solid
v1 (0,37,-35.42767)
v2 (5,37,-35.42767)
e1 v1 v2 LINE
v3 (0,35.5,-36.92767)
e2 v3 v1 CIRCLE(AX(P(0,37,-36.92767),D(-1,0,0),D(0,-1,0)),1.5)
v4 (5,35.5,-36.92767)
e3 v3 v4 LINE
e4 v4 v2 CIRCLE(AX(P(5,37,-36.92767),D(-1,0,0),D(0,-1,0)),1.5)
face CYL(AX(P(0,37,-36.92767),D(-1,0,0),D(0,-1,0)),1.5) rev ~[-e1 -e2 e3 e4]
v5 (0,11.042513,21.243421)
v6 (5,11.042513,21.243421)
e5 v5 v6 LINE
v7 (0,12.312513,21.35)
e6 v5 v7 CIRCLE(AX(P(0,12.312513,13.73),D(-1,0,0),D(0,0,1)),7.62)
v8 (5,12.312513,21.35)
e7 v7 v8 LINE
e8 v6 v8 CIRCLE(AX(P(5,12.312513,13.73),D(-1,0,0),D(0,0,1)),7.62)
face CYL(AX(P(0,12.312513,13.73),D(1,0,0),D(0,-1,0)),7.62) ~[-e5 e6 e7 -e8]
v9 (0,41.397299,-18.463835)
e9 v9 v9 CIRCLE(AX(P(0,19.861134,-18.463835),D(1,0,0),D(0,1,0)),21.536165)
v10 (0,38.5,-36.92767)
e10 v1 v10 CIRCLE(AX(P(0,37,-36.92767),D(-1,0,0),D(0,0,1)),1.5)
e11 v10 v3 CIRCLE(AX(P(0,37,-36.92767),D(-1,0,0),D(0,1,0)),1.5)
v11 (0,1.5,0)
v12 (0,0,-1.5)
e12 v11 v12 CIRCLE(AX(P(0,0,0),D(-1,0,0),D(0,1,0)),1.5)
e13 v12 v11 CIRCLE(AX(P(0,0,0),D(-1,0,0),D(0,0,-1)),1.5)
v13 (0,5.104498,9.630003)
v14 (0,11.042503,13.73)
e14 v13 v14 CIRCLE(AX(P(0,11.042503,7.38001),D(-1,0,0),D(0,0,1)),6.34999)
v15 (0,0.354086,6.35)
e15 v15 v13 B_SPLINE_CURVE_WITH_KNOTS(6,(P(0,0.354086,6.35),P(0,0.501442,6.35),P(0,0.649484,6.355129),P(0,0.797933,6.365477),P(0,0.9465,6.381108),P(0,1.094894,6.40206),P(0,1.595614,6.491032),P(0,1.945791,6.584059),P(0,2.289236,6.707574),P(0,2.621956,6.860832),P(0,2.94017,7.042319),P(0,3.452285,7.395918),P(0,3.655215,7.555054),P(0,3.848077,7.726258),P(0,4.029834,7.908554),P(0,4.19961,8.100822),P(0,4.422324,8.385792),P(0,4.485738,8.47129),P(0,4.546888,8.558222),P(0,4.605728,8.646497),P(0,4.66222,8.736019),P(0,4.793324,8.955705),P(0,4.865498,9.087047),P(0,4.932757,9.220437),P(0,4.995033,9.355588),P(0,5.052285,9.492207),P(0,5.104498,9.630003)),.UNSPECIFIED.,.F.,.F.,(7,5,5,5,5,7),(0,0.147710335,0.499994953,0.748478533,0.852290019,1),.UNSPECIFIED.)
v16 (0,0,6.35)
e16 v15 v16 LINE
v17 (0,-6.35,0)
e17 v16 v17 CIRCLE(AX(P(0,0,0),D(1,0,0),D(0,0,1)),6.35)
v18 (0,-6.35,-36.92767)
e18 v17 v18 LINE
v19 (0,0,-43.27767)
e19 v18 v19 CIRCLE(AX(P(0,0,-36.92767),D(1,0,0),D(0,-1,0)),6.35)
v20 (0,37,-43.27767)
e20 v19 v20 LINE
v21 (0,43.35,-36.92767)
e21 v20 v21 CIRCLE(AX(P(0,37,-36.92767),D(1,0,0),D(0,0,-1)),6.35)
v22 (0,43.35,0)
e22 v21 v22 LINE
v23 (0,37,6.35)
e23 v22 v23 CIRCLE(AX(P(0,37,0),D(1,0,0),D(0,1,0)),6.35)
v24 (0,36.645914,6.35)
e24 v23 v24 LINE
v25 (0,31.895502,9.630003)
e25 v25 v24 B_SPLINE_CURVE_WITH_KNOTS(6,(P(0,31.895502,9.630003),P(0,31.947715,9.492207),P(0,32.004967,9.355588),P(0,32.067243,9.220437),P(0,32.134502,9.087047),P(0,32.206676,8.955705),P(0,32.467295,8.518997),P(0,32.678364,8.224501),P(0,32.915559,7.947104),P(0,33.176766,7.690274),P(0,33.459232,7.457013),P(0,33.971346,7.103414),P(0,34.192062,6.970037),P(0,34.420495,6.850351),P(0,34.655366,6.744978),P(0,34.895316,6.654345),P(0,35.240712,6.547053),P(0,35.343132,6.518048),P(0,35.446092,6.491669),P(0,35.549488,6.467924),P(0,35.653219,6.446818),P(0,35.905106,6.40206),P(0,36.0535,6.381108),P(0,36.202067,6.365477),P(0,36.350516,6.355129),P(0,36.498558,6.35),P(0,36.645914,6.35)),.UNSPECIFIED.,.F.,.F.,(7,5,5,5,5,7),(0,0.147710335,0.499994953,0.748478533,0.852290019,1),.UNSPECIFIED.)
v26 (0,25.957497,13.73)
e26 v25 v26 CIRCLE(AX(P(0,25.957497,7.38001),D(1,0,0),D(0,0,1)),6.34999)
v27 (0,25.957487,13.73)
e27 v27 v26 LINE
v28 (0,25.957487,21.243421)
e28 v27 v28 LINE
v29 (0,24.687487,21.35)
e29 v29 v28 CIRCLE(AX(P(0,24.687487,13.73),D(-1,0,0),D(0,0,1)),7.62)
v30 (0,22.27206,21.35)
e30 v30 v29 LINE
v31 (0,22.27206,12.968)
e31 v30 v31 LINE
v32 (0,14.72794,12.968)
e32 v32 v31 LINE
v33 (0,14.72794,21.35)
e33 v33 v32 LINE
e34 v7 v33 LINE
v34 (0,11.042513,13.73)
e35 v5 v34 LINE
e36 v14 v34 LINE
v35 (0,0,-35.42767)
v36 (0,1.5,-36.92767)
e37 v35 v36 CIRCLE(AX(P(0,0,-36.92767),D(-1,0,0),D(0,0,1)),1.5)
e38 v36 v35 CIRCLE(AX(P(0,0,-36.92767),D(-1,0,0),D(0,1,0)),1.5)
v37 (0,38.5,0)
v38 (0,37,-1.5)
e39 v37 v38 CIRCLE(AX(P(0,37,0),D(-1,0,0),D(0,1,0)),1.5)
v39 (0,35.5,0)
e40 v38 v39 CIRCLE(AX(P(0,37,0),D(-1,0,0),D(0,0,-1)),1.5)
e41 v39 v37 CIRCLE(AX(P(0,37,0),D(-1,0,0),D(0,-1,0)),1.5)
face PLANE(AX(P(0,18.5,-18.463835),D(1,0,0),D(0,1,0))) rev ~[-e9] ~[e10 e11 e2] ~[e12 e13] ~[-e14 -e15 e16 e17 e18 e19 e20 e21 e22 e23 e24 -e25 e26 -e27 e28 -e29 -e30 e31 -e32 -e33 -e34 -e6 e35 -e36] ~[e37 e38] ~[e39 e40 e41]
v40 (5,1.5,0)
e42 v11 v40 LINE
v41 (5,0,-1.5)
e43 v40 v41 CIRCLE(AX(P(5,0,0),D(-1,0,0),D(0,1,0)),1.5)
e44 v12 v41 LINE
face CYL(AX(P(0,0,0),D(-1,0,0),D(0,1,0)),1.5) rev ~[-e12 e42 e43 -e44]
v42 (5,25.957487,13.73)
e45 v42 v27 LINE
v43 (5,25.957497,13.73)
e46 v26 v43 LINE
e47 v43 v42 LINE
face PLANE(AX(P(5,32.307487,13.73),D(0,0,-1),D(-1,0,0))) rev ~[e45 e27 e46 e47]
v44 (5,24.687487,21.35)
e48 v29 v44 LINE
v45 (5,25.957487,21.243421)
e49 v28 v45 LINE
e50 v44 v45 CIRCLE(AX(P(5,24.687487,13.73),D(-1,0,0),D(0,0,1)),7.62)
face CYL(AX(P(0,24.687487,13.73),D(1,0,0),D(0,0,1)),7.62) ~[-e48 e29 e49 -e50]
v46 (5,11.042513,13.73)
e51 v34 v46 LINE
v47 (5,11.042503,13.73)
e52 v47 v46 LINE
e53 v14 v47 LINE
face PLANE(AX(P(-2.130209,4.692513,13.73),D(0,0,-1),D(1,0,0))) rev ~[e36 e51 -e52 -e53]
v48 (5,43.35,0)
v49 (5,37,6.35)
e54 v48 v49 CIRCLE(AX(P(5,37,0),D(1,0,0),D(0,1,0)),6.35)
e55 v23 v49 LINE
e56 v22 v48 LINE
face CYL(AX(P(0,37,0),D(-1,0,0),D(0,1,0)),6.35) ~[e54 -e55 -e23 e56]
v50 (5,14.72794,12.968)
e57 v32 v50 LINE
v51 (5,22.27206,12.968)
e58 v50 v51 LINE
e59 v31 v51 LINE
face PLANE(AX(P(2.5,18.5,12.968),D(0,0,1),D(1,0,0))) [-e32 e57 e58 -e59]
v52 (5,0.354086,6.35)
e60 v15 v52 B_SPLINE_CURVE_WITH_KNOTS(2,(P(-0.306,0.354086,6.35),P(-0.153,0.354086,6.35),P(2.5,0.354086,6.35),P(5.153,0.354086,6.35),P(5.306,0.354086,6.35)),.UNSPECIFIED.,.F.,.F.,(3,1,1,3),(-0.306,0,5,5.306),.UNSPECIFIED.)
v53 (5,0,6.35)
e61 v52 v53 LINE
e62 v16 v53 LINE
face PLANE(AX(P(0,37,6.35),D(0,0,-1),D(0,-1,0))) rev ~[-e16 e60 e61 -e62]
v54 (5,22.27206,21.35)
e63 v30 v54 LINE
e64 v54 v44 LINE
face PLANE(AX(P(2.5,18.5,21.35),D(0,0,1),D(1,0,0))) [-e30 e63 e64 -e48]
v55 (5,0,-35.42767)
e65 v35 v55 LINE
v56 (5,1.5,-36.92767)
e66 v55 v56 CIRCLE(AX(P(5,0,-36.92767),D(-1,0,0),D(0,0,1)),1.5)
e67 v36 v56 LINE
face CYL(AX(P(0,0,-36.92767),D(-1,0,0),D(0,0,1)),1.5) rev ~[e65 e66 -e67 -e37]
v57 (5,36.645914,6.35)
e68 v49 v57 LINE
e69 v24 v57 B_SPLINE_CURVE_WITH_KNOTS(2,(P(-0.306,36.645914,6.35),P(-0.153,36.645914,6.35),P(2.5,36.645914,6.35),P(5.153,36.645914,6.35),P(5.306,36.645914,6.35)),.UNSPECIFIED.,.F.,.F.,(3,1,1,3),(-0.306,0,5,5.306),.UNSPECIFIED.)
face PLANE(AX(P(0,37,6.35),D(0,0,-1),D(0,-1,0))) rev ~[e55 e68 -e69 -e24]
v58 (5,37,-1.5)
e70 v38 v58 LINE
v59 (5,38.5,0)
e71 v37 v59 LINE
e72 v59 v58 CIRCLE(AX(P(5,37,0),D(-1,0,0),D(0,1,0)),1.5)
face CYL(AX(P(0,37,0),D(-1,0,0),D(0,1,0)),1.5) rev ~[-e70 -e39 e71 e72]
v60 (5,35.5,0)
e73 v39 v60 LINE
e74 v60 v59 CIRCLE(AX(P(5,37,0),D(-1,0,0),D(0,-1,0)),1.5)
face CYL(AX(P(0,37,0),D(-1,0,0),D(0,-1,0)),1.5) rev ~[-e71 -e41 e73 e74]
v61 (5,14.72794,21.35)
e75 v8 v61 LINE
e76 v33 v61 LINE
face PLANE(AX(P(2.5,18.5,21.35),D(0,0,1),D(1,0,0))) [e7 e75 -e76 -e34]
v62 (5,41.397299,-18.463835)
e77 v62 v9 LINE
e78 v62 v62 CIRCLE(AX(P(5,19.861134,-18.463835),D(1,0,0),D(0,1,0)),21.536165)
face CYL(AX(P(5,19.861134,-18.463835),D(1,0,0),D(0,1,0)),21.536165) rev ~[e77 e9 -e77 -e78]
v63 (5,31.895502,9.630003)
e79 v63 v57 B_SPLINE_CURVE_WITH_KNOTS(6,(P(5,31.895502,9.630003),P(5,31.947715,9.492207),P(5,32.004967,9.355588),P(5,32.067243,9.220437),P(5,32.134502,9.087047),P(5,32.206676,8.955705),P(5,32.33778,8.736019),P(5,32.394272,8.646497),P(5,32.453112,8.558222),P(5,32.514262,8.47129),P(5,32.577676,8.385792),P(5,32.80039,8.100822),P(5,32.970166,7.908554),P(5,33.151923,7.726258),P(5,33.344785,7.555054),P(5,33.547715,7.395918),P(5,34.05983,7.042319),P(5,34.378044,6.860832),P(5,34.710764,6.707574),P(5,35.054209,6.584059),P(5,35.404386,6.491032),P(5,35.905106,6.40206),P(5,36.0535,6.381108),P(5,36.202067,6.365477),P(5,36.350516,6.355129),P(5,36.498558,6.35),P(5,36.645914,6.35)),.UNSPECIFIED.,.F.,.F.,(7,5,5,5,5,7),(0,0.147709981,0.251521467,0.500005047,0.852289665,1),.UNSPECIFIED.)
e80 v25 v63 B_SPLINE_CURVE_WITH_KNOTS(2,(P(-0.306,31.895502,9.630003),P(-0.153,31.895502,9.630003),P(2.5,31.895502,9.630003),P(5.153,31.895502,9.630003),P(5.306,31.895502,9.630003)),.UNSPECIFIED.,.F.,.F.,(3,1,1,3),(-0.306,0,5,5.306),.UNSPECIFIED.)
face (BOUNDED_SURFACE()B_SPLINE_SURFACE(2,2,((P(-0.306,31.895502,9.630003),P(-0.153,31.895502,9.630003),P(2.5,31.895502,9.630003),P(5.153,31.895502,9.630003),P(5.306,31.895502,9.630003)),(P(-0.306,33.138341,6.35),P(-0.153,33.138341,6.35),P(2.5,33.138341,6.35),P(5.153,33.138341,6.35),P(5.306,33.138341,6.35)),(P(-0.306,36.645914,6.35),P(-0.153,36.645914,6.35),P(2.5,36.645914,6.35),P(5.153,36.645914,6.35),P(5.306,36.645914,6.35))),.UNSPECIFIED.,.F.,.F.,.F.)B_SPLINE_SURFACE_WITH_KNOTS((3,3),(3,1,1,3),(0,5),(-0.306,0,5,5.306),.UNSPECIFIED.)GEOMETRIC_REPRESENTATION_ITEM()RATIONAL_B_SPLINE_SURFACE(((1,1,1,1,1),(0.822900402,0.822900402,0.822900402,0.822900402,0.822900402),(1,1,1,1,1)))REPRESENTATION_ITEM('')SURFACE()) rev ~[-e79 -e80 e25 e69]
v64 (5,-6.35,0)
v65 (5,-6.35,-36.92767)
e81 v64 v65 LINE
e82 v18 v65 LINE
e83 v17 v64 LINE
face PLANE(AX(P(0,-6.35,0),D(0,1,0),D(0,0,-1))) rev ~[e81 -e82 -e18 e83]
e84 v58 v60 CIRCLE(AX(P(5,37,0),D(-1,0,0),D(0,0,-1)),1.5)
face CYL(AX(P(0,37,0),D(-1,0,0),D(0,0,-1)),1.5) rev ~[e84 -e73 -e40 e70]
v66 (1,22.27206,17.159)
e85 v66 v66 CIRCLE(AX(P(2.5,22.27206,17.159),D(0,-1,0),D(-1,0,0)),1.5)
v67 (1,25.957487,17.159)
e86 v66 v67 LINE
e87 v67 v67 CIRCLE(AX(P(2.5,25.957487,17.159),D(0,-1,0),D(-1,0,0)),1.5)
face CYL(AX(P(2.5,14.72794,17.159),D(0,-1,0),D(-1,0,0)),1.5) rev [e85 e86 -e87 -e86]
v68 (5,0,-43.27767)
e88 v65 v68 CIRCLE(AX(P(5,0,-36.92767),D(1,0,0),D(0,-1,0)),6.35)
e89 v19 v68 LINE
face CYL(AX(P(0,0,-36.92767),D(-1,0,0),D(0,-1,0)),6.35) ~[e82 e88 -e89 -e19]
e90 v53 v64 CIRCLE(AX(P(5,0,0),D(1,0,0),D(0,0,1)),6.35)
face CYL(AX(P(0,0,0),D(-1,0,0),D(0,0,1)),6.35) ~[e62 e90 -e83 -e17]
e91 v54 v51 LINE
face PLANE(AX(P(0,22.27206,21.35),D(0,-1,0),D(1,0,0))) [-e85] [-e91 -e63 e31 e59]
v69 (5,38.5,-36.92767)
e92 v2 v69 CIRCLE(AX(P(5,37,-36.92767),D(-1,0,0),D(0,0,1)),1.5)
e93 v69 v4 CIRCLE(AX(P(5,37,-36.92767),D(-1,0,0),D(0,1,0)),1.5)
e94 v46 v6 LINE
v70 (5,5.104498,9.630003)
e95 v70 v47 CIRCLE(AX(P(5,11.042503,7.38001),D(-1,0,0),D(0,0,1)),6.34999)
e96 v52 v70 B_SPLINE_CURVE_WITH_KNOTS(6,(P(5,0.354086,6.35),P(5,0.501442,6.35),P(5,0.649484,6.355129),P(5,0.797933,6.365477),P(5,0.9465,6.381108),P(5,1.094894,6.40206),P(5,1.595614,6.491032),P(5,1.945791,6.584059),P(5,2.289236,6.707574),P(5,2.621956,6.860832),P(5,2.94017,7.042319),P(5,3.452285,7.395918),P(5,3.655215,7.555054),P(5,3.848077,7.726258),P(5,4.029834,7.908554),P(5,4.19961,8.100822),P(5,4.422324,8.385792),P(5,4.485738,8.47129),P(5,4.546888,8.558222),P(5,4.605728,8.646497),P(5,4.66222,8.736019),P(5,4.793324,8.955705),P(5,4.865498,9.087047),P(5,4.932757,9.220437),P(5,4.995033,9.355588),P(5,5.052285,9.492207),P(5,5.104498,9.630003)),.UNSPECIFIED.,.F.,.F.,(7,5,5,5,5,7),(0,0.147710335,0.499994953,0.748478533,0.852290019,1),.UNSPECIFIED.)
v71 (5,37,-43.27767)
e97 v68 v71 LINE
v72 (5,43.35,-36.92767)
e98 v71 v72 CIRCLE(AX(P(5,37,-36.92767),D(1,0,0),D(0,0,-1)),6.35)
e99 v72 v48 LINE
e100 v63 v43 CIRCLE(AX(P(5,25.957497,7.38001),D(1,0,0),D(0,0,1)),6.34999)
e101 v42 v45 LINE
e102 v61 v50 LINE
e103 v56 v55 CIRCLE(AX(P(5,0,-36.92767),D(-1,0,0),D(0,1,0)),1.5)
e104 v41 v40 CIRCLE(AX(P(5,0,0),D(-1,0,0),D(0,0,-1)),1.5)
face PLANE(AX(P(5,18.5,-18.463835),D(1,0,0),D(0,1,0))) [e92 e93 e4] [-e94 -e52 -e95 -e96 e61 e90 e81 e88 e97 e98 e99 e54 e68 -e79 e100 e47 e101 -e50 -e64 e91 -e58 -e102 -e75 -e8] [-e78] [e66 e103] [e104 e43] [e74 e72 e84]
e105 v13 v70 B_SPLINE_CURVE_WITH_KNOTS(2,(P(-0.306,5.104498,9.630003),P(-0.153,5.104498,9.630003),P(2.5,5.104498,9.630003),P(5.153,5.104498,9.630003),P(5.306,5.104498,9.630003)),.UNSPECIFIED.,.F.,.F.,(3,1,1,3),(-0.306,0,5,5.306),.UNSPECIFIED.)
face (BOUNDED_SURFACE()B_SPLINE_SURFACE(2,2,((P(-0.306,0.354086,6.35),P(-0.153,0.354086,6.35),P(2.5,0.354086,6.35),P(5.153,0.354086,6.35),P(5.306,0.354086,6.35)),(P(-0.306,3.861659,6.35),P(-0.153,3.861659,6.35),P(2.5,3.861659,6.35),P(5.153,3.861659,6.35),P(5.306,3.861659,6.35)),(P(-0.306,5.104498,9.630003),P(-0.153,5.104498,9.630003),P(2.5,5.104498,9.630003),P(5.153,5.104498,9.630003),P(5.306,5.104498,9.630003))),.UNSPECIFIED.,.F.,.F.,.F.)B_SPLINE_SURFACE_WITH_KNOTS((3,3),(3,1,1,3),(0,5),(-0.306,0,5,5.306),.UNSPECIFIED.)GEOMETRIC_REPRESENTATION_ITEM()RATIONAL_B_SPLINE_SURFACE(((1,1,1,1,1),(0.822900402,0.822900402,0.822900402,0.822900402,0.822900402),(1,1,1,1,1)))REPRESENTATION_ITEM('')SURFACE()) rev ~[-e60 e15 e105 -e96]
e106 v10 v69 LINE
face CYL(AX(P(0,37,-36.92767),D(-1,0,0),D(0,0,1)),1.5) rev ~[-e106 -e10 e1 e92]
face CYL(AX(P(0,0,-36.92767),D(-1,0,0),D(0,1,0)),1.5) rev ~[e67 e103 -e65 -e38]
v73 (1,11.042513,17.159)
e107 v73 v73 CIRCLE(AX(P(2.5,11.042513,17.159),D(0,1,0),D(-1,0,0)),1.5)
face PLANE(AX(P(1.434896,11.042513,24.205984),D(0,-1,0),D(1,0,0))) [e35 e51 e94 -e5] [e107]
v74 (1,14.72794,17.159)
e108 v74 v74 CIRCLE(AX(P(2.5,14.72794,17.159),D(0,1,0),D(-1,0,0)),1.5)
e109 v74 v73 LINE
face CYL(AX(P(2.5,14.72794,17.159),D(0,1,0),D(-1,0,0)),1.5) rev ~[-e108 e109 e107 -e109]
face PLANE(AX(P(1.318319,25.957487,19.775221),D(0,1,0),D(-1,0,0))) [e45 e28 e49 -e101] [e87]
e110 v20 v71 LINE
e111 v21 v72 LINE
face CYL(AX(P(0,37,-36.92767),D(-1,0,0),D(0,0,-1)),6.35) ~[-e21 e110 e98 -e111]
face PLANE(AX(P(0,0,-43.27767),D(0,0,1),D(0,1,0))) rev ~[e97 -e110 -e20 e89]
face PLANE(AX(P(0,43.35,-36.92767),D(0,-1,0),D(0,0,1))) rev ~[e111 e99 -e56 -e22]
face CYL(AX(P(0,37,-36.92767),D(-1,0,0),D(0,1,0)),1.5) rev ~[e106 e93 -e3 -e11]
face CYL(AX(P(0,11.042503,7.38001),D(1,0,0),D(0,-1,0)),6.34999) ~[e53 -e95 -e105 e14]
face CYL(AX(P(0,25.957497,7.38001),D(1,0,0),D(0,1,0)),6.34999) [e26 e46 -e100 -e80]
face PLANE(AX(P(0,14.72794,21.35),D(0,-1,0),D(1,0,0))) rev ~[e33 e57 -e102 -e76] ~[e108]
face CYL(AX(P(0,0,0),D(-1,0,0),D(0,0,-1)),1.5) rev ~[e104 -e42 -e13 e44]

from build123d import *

# Parameters (mm, degrees)
F1_DEPTH       = 5
F2_R           = 21.536165151
F3_DEPTH       = 5.001
F4_W           = 5
F4_H           = 27.6149739623
F5_DEPTH       = 15
F6_R           = 7.62
F7_W           = 5
F7_H           = 7.544119532
F8_DEPTH       = 8.382
F9_R           = 1.5
F10_DEPTH      = 21.078940234
F10_DEPTH_BACK = 28.623059766
F11_W          = 7.3633623496
F11_H          = 12.0904415441
F12_DEPTH      = 6.35
F13_W          = 7.1302087698
F13_H          = 20.9519683909
F14_DEPTH      = 6.35
F15_R          = 6.34999
F16_R          = 5.08


# Not quite as in the source:
# - a fillet or chamfer is up to 0.001 mm smaller than in the source, because OpenCascade refuses the exact size


with BuildPart() as f1:
    # F0 (on Right) → F1 (new body)
    with BuildSketch(Plane.YZ):
        with BuildLine():
            ThreePointArc((0, 6.35), (-4.4901280605, 4.4901280605), (-6.35, 0))
            Line((-6.35, 0), (-6.35, -36.927669698))
            ThreePointArc((-6.35, -36.927669698), (-4.4901280605, -41.4177977585), (0, -43.277669698))
            Line((0, -43.277669698), (37, -43.277669698))
            ThreePointArc((37, -43.277669698), (41.4901280605, -41.4177977585), (43.35, -36.927669698))
            Line((43.35, -36.927669698), (43.35, 0))
            ThreePointArc((43.35, 0), (41.4901280605, 4.4901280605), (37, 6.35))
            Line((37, 6.35), (0, 6.35))
        make_face()
        with BuildLine():
            ThreePointArc((0, -1.5), (-1.0606601718, 1.0606601718), (1.5, 0))
            Line((1.5, 0), (35.5, 0))
            ThreePointArc((35.5, 0), (37, 1.5), (38.5, 0))
            ThreePointArc((38.5, 0), (38.0606601718, -1.0606601718), (37, -1.5))
            Line((37, -1.5), (37, -35.4276701232))
            ThreePointArc((37, -35.4276701232), (38.0606601718, -35.8670099514), (38.5, -36.9276701232))
            ThreePointArc((38.5, -36.9276701232), (37, -38.4276701232), (35.5, -36.9276701232))
            Line((35.5, -36.9276701232), (1.5, -36.9276701232))
            ThreePointArc((1.5, -36.9276701232), (-1.0606601718, -37.988330295), (0, -35.4276701232))
            Line((0, -35.4276701232), (0, -1.5))
        make_face(mode=Mode.SUBTRACT)
        with BuildLine():
            Line((35.5, 0), (1.5, 0))
            ThreePointArc((1.5, 0), (1.0606601718, -1.0606601718), (0, -1.5))
            Line((0, -1.5), (0, -35.4276701232))
            ThreePointArc((0, -35.4276701232), (1.0606601718, -35.8670099514), (1.5, -36.9276701232))
            Line((1.5, -36.9276701232), (35.5, -36.9276701232))
            ThreePointArc((35.5, -36.9276701232), (35.9393398282, -35.8670099514), (37, -35.4276701232))
            Line((37, -35.4276701232), (37, -1.5))
            ThreePointArc((37, -1.5), (35.9393398282, -1.0606601718), (35.5, 0))
        make_face()
    extrude(amount=F1_DEPTH)

    # F2 (on face) → F3 (cut, through all)
    with BuildSketch(Plane.YZ.offset(5)):
        with Locations((19.8611337692, -18.463834849)):
            Circle(F2_R)
    extrude(amount=-F3_DEPTH, mode=Mode.SUBTRACT)

    # F4 (on face) → F5 (join)
    with BuildSketch(Plane.XY.offset(6.35)):
        with Locations((2.5, 18.5)):
            Rectangle(F4_W, F4_H)
    extrude(amount=F5_DEPTH)

    # F6
    f6_edges = [f1.edges().sort_by_distance(p)[0] for p in [
        (2.5, 32.307487, 21.35),
        (2.5, 4.692513, 21.35),
    ]]
    fillet(f6_edges, radius=F6_R)

    # F7 (on face) → F8 (cut)
    with BuildSketch(Plane.XY.offset(21.35)):
        with Locations((2.5, 18.5)):
            Rectangle(F7_W, F7_H)
    extrude(amount=-F8_DEPTH, mode=Mode.SUBTRACT)

    # F9 (on face) → F10 (cut, two sides)
    with BuildSketch(Plane(origin=(0, 14.727940234, 0), x_dir=(-1, 0, 0), z_dir=(0, 1, 0))) as f10_sk:
        with Locations((-2.5, 17.159)):
            Circle(F9_R)
    extrude(amount=-F10_DEPTH, mode=Mode.SUBTRACT)
    extrude(f10_sk.sketch, amount=F10_DEPTH_BACK, mode=Mode.SUBTRACT)

    # F11 (on face) → F12 (cut)
    with BuildSketch(Plane(origin=(0, 32.3074869812, 0), x_dir=(-1, 0, 0), z_dir=(0, 1, 0))):
        with Locations((-1.3183188252, 19.775220772)):
            Rectangle(F11_W, F11_H)
    extrude(amount=-F12_DEPTH, mode=Mode.SUBTRACT)

    # F13 (on face) → F14 (cut)
    with BuildSketch(Plane.XZ.offset(-4.6925130188)):
        with Locations((1.4348956151, 24.2059841955)):
            Rectangle(F13_W, F13_H)
    extrude(amount=-F14_DEPTH, mode=Mode.SUBTRACT)

    # F15 (radius 6.35 in the source; OpenCascade refuses exactly that, so slightly less here)
    f15_edges = [f1.edges().sort_by_distance(p)[0] for p in [
        (2.5, 4.692513, 13.73),
        (2.5, 32.307487, 13.73),
    ]]
    fillet(f15_edges, radius=F15_R)

    # F16
    f16_edges = [f1.edges().sort_by_distance(p)[0] for p in [
        (2.5, 4.692513, 6.35),
        (2.5, 32.307487, 6.35),
    ]]
    fillet(f16_edges, radius=F16_R)


solid = f1.part
